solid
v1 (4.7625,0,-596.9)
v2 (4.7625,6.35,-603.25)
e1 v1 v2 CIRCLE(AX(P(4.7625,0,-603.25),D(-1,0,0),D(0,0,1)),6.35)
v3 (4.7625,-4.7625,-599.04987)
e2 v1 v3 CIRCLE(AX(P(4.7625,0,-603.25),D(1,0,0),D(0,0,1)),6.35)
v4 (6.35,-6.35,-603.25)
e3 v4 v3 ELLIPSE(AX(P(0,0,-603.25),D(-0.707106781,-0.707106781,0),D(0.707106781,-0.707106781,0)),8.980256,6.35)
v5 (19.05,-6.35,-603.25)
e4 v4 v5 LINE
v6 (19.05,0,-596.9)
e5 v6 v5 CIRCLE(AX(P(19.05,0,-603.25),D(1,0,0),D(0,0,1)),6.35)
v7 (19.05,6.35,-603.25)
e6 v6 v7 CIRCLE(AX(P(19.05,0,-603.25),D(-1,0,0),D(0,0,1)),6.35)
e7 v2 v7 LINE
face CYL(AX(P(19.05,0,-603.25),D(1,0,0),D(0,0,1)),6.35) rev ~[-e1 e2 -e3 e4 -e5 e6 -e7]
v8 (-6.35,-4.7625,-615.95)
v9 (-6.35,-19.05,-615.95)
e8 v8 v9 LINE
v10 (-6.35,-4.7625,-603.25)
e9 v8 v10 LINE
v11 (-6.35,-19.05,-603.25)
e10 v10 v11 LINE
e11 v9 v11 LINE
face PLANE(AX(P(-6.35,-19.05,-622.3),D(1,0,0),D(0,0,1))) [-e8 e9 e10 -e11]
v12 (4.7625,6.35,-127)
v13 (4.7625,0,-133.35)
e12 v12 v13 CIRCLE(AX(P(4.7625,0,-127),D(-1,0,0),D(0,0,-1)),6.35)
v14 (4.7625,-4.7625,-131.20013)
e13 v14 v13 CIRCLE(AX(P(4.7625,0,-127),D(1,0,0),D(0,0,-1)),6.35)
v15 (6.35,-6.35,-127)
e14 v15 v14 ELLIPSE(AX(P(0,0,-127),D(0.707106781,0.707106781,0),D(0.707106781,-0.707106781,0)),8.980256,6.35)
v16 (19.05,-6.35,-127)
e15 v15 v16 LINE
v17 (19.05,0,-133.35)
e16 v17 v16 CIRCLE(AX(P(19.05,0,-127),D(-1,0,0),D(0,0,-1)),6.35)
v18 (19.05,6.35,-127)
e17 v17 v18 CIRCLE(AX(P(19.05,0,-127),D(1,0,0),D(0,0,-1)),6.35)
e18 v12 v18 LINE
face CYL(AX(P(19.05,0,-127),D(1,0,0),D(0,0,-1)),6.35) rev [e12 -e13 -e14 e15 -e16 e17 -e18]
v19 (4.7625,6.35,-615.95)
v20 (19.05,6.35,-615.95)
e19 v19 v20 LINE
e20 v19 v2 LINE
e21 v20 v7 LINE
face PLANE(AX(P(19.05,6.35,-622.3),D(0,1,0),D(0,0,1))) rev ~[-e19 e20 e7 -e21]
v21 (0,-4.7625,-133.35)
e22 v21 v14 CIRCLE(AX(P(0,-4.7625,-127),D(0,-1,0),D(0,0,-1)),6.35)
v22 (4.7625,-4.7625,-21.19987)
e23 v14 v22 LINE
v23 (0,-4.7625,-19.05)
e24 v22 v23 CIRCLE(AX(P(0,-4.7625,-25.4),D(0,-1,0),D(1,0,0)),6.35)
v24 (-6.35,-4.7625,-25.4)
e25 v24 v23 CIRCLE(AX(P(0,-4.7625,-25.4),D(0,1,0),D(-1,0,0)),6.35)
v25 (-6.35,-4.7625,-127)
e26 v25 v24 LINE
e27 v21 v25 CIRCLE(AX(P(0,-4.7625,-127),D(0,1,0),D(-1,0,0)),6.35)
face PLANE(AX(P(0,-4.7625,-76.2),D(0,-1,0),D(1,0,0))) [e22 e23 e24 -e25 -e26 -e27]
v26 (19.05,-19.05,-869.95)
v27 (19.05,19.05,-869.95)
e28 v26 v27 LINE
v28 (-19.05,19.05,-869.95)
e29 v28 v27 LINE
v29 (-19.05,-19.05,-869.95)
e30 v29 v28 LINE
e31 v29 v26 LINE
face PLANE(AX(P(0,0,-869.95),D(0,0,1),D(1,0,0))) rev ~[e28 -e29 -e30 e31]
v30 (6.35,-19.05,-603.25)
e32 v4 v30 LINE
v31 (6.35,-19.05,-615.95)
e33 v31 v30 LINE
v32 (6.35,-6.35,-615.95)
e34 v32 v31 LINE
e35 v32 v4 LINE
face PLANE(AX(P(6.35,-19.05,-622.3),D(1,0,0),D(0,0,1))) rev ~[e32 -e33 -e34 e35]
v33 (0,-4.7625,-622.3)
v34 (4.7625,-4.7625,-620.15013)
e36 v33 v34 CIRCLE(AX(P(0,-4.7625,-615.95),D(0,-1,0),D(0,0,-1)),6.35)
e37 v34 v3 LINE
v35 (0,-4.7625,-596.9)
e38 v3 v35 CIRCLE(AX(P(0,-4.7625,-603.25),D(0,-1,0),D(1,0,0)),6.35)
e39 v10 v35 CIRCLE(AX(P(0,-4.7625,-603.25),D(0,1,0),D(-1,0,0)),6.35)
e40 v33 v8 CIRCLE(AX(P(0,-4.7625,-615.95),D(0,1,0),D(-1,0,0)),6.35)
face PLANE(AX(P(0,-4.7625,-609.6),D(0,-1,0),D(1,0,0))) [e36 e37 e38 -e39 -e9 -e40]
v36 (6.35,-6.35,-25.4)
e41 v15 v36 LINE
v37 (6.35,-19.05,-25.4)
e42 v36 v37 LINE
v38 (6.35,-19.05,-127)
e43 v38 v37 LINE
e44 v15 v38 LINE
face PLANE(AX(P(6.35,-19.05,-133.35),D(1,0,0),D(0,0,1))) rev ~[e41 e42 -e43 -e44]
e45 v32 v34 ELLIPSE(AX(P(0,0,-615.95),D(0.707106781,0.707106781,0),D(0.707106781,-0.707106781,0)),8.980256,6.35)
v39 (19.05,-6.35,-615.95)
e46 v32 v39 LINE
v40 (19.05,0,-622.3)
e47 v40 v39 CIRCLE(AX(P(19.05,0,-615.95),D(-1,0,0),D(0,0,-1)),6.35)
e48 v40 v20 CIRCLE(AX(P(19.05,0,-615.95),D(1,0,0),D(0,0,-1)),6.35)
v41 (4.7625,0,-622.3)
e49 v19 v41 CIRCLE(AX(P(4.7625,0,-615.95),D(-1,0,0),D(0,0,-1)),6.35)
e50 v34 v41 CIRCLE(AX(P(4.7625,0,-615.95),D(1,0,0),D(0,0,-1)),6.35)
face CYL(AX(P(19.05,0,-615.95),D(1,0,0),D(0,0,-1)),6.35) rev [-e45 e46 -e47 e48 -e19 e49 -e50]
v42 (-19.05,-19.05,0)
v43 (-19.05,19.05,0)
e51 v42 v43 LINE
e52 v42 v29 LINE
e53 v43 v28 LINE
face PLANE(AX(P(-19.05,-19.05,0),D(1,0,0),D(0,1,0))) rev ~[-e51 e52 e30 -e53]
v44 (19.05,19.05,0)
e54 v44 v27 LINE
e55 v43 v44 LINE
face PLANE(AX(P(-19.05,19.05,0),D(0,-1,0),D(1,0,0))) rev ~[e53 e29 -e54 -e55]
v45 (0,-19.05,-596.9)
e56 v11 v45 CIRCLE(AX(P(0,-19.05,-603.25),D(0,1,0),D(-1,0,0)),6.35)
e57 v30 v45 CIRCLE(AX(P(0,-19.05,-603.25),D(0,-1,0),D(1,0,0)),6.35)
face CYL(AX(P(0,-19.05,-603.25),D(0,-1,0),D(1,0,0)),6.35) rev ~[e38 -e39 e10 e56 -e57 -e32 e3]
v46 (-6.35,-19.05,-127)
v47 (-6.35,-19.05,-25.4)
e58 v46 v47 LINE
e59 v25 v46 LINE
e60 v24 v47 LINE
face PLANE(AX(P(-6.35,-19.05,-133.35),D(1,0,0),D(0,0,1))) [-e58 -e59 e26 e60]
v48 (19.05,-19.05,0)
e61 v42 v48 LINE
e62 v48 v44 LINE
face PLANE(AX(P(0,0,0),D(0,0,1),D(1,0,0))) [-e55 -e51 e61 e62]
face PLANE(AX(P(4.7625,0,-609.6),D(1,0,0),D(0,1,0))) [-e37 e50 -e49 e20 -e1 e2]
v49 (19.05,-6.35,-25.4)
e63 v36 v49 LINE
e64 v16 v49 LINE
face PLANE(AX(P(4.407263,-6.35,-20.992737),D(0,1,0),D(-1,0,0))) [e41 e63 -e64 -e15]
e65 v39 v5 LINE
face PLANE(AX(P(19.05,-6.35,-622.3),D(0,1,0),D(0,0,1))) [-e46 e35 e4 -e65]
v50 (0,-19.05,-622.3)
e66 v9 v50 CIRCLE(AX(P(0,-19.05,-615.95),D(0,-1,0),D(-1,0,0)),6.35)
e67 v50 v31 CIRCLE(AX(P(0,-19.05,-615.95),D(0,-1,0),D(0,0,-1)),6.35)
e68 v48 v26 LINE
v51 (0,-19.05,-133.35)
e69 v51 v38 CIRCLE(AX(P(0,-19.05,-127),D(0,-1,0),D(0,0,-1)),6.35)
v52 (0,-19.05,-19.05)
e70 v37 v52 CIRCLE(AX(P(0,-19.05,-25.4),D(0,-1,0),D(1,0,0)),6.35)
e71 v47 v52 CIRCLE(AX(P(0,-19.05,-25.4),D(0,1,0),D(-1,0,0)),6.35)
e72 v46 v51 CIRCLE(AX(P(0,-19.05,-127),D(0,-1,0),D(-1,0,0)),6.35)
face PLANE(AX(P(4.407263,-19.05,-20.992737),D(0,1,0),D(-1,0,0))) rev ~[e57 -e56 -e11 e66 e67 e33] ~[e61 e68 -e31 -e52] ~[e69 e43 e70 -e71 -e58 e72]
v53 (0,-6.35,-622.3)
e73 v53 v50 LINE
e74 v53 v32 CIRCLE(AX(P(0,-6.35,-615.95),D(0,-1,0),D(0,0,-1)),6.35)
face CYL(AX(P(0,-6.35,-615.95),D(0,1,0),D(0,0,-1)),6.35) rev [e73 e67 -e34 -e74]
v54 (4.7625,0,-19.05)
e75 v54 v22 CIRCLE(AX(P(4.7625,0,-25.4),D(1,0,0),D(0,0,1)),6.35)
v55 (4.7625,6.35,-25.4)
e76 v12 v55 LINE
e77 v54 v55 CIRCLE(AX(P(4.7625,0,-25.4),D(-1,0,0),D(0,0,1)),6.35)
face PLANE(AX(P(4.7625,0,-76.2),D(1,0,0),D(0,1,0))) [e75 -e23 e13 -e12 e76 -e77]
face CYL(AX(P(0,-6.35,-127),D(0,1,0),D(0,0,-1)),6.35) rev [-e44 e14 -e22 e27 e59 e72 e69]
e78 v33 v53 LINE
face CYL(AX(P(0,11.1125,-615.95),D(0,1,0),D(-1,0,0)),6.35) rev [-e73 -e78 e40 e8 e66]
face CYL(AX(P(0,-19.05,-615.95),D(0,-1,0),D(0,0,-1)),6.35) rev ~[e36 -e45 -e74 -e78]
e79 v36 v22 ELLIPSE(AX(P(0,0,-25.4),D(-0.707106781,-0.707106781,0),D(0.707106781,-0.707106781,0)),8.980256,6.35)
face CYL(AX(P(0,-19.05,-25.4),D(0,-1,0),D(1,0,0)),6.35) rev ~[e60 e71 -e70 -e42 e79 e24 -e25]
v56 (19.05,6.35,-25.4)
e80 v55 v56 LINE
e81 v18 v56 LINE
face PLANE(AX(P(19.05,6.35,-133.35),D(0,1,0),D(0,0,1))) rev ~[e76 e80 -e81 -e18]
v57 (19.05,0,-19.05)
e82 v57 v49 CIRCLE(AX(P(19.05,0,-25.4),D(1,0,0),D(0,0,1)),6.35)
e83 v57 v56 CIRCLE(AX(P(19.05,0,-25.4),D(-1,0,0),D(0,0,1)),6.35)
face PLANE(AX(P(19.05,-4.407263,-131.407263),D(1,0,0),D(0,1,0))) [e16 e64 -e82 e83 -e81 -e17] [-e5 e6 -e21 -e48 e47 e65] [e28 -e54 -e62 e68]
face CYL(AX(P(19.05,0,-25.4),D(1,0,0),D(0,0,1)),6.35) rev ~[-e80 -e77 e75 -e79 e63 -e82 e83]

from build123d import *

# Parameters (mm, degrees)
F0_W         = 38.1
F0_H         = 38.1
F1_DEPTH     = 869.95
F2_W         = 12.7
F2_H         = 114.3
F2_H_2       = 25.4
F3_DEPTH     = 14.2875
F4_W         = 12.7
F4_H         = 114.3
F4_H_2       = 25.4
F5_DEPTH     = 14.2875
F6_T1_DEPTH  = 30.1625
F6_T3_DEPTH  = 12.7
F6_T5_DEPTH  = 30.1625
F6_T7_DEPTH  = 12.7
F6_T13_DEPTH = 28.575
F6_T17_DEPTH = 28.575
F6_T24_DEPTH = 28.575
F6_T28_DEPTH = 28.575
F6_T35_DEPTH = 28.575
F6_T39_DEPTH = 28.575
F6_T46_DEPTH = 28.575
F6_T50_DEPTH = 28.575


# Not quite as in the source:
# - a fillet or chamfer that OpenCascade refuses, or shapes differently, is made with other operations: its cross-section is extruded or revolved along the edge and cut away or added


with BuildPart() as f1:
    # F0 (on Top) → F1 (new body)
    with BuildSketch(Plane.XY):
        Rectangle(F0_W, F0_H)
    extrude(amount=-F1_DEPTH)

    # F2 (on face) → F3 (cut)
    with BuildSketch(Plane.XZ.offset(19.05)):
        with Locations((0, -76.2)):
            Rectangle(F2_W, F2_H)
        with Locations((0, -609.6)):
            Rectangle(F2_W, F2_H_2)
    extrude(amount=-F3_DEPTH, mode=Mode.SUBTRACT)

    # F4 (on face) → F5 (cut)
    with BuildSketch(Plane.YZ.offset(19.05)):
        with Locations((0, -76.2)):
            Rectangle(F4_W, F4_H)
        with Locations((0, -609.6)):
            Rectangle(F4_W, F4_H_2)
    extrude(amount=-F5_DEPTH, mode=Mode.SUBTRACT)

    # F6: fillet of radius 6.35 on 16 edges, made by hand

    # F6_s2 → F6_t1 (join)
    with BuildSketch(Plane.XZ.offset(-11.1125)):
        with BuildLine():
            ThreePointArc((-6.35, -25.4), (-4.4901280605, -20.9098719395), (0, -19.05))
            Line((0, -19.05), (-6.35, -19.05))
            Line((-6.35, -19.05), (-6.35, -25.4))
        make_face()
        with BuildLine():
            ThreePointArc((-6.35, -127), (-4.4901280605, -131.4901280605), (0, -133.35))
            Line((0, -133.35), (-6.35, -133.35))
            Line((-6.35, -133.35), (-6.35, -127))
        make_face()
        with BuildLine():
            ThreePointArc((-6.35, -603.25), (-4.4901280605, -598.7598719395), (0, -596.9))
            Line((0, -596.9), (-6.35, -596.9))
            Line((-6.35, -596.9), (-6.35, -603.25))
        make_face()
        with BuildLine():
            ThreePointArc((-6.35, -615.95), (-4.4901280605, -620.4401280605), (0, -622.3))
            Line((0, -622.3), (-6.35, -622.3))
            Line((-6.35, -622.3), (-6.35, -615.95))
        make_face()
    extrude(amount=F6_T1_DEPTH)

    # F6_s4 → F6_t3 (join)
    with BuildSketch(Plane.XZ.offset(6.35)):
        with BuildLine():
            ThreePointArc((6.35, -25.4), (4.4901280605, -20.9098719395), (0, -19.05))
            Line((0, -19.05), (6.35, -19.05))
            Line((6.35, -19.05), (6.35, -25.4))
        make_face()
        with BuildLine():
            ThreePointArc((0, -133.35), (4.4901280605, -131.4901280605), (6.35, -127))
            Line((6.35, -127), (6.35, -133.35))
            Line((6.35, -133.35), (0, -133.35))
        make_face()
        with BuildLine():
            ThreePointArc((6.35, -603.25), (4.4901280605, -598.7598719395), (0, -596.9))
            Line((0, -596.9), (6.35, -596.9))
            Line((6.35, -596.9), (6.35, -603.25))
        make_face()
        with BuildLine():
            ThreePointArc((0, -622.3), (4.4901280605, -620.4401280605), (6.35, -615.95))
            Line((6.35, -615.95), (6.35, -622.3))
            Line((6.35, -622.3), (0, -622.3))
        make_face()
    extrude(amount=F6_T3_DEPTH)

    # F6_s6 → F6_t5 (join)
    with BuildSketch(Plane.YZ.offset(-11.1125)):
        with BuildLine():
            ThreePointArc((0, -133.35), (4.4901280605, -131.4901280605), (6.35, -127))
            Line((6.35, -127), (6.35, -133.35))
            Line((6.35, -133.35), (0, -133.35))
        make_face()
        with BuildLine():
            ThreePointArc((0, -19.05), (4.4901280605, -20.9098719395), (6.35, -25.4))
            Line((6.35, -25.4), (6.35, -19.05))
            Line((6.35, -19.05), (0, -19.05))
        make_face()
        with BuildLine():
            ThreePointArc((0, -596.9), (4.4901280605, -598.7598719395), (6.35, -603.25))
            Line((6.35, -603.25), (6.35, -596.9))
            Line((6.35, -596.9), (0, -596.9))
        make_face()
        with BuildLine():
            ThreePointArc((0, -622.3), (4.4901280605, -620.4401280605), (6.35, -615.95))
            Line((6.35, -615.95), (6.35, -622.3))
            Line((6.35, -622.3), (0, -622.3))
        make_face()
    extrude(amount=F6_T5_DEPTH)

    # F6_s8 → F6_t7 (join)
    with BuildSketch(Plane.YZ.offset(6.35)):
        with BuildLine():
            ThreePointArc((0, -133.35), (-4.4901280605, -131.4901280605), (-6.35, -127))
            Line((-6.35, -127), (-6.35, -133.35))
            Line((-6.35, -133.35), (0, -133.35))
        make_face()
        with BuildLine():
            ThreePointArc((0, -19.05), (-4.4901280605, -20.9098719395), (-6.35, -25.4))
            Line((-6.35, -25.4), (-6.35, -19.05))
            Line((-6.35, -19.05), (0, -19.05))
        make_face()
        with BuildLine():
            ThreePointArc((0, -596.9), (-4.4901280605, -598.7598719395), (-6.35, -603.25))
            Line((-6.35, -603.25), (-6.35, -596.9))
            Line((-6.35, -596.9), (0, -596.9))
        make_face()
        with BuildLine():
            ThreePointArc((0, -622.3), (-4.4901280605, -620.4401280605), (-6.35, -615.95))
            Line((-6.35, -615.95), (-6.35, -622.3))
            Line((-6.35, -622.3), (0, -622.3))
        make_face()
    extrude(amount=F6_T7_DEPTH)


with BuildPart() as f6_tool11:
    # F6_s12 → F6_t13 (new body)
    with BuildSketch(Plane.XZ.offset(19.05)):
        with BuildLine():
            ThreePointArc((6.35, -25.4), (4.4901280605, -20.9098719395), (0, -19.05))
            Line((0, -19.05), (6.35, -19.05))
            Line((6.35, -19.05), (6.35, -25.4))
        make_face()
    extrude(amount=-F6_T13_DEPTH)

    split(bisect_by=Plane.XZ.offset(6.35), keep=Keep.BOTTOM)


with BuildPart() as f6_tool15:
    # F6_s16 → F6_t17 (new body)
    with BuildSketch(Plane.YZ.offset(19.05)):
        with BuildLine():
            ThreePointArc((0, -19.05), (-4.4901280605, -20.9098719395), (-6.35, -25.4))
            Line((-6.35, -25.4), (-6.35, -19.05))
            Line((-6.35, -19.05), (0, -19.05))
        make_face()
    extrude(amount=-F6_T17_DEPTH)

    split(bisect_by=Plane.YZ.offset(6.35), keep=Keep.BOTTOM)


with BuildPart() as f6_tool11_1:
    add(f6_tool11.part)

    # F6_t19: intersect F6_tool15
    add(f6_tool15.part, mode=Mode.INTERSECT)


with BuildPart() as f1_1:
    add(f1.part)

    # F6_t9: union F6_tool11
    add(f6_tool11_1.part)


with BuildPart() as f6_tool22:
    # F6_s23 → F6_t24 (new body)
    with BuildSketch(Plane.YZ.offset(19.05)):
        with BuildLine():
            ThreePointArc((0, -133.35), (-4.4901280605, -131.4901280605), (-6.35, -127))
            Line((-6.35, -127), (-6.35, -133.35))
            Line((-6.35, -133.35), (0, -133.35))
        make_face()
    extrude(amount=-F6_T24_DEPTH)

    split(bisect_by=Plane.YZ.offset(6.35), keep=Keep.BOTTOM)


with BuildPart() as f6_tool26:
    # F6_s27 → F6_t28 (new body)
    with BuildSketch(Plane.XZ.offset(19.05)):
        with BuildLine():
            ThreePointArc((0, -133.35), (4.4901280605, -131.4901280605), (6.35, -127))
            Line((6.35, -127), (6.35, -133.35))
            Line((6.35, -133.35), (0, -133.35))
        make_face()
    extrude(amount=-F6_T28_DEPTH)

    split(bisect_by=Plane.XZ.offset(6.35), keep=Keep.BOTTOM)


with BuildPart() as f6_tool22_1:
    add(f6_tool22.part)

    # F6_t30: intersect F6_tool26
    add(f6_tool26.part, mode=Mode.INTERSECT)


with BuildPart() as f1_2:
    add(f1_1.part)

    # F6_t20: union F6_tool22
    add(f6_tool22_1.part)


with BuildPart() as f6_tool33:
    # F6_s34 → F6_t35 (new body)
    with BuildSketch(Plane.XZ.offset(19.05)):
        with BuildLine():
            ThreePointArc((6.35, -603.25), (4.4901280605, -598.7598719395), (0, -596.9))
            Line((0, -596.9), (6.35, -596.9))
            Line((6.35, -596.9), (6.35, -603.25))
        make_face()
    extrude(amount=-F6_T35_DEPTH)

    split(bisect_by=Plane.XZ.offset(6.35), keep=Keep.BOTTOM)


with BuildPart() as f6_tool37:
    # F6_s38 → F6_t39 (new body)
    with BuildSketch(Plane.YZ.offset(19.05)):
        with BuildLine():
            ThreePointArc((0, -596.9), (-4.4901280605, -598.7598719395), (-6.35, -603.25))
            Line((-6.35, -603.25), (-6.35, -596.9))
            Line((-6.35, -596.9), (0, -596.9))
        make_face()
    extrude(amount=-F6_T39_DEPTH)

    split(bisect_by=Plane.YZ.offset(6.35), keep=Keep.BOTTOM)


with BuildPart() as f6_tool33_1:
    add(f6_tool33.part)

    # F6_t41: intersect F6_tool37
    add(f6_tool37.part, mode=Mode.INTERSECT)


with BuildPart() as f1_3:
    add(f1_2.part)

    # F6_t31: union F6_tool33
    add(f6_tool33_1.part)


with BuildPart() as f6_tool44:
    # F6_s45 → F6_t46 (new body)
    with BuildSketch(Plane.YZ.offset(19.05)):
        with BuildLine():
            ThreePointArc((0, -622.3), (-4.4901280605, -620.4401280605), (-6.35, -615.95))
            Line((-6.35, -615.95), (-6.35, -622.3))
            Line((-6.35, -622.3), (0, -622.3))
        make_face()
    extrude(amount=-F6_T46_DEPTH)

    split(bisect_by=Plane.YZ.offset(6.35), keep=Keep.BOTTOM)


with BuildPart() as f6_tool48:
    # F6_s49 → F6_t50 (new body)
    with BuildSketch(Plane.XZ.offset(19.05)):
        with BuildLine():
            ThreePointArc((0, -622.3), (4.4901280605, -620.4401280605), (6.35, -615.95))
            Line((6.35, -615.95), (6.35, -622.3))
            Line((6.35, -622.3), (0, -622.3))
        make_face()
    extrude(amount=-F6_T50_DEPTH)

    split(bisect_by=Plane.XZ.offset(6.35), keep=Keep.BOTTOM)


with BuildPart() as f6_tool44_1:
    add(f6_tool44.part)

    # F6_t52: intersect F6_tool48
    add(f6_tool48.part, mode=Mode.INTERSECT)


with BuildPart() as f1_4:
    add(f1_3.part)

    # F6_t42: union F6_tool44
    add(f6_tool44_1.part)


solid = f1_4.part
